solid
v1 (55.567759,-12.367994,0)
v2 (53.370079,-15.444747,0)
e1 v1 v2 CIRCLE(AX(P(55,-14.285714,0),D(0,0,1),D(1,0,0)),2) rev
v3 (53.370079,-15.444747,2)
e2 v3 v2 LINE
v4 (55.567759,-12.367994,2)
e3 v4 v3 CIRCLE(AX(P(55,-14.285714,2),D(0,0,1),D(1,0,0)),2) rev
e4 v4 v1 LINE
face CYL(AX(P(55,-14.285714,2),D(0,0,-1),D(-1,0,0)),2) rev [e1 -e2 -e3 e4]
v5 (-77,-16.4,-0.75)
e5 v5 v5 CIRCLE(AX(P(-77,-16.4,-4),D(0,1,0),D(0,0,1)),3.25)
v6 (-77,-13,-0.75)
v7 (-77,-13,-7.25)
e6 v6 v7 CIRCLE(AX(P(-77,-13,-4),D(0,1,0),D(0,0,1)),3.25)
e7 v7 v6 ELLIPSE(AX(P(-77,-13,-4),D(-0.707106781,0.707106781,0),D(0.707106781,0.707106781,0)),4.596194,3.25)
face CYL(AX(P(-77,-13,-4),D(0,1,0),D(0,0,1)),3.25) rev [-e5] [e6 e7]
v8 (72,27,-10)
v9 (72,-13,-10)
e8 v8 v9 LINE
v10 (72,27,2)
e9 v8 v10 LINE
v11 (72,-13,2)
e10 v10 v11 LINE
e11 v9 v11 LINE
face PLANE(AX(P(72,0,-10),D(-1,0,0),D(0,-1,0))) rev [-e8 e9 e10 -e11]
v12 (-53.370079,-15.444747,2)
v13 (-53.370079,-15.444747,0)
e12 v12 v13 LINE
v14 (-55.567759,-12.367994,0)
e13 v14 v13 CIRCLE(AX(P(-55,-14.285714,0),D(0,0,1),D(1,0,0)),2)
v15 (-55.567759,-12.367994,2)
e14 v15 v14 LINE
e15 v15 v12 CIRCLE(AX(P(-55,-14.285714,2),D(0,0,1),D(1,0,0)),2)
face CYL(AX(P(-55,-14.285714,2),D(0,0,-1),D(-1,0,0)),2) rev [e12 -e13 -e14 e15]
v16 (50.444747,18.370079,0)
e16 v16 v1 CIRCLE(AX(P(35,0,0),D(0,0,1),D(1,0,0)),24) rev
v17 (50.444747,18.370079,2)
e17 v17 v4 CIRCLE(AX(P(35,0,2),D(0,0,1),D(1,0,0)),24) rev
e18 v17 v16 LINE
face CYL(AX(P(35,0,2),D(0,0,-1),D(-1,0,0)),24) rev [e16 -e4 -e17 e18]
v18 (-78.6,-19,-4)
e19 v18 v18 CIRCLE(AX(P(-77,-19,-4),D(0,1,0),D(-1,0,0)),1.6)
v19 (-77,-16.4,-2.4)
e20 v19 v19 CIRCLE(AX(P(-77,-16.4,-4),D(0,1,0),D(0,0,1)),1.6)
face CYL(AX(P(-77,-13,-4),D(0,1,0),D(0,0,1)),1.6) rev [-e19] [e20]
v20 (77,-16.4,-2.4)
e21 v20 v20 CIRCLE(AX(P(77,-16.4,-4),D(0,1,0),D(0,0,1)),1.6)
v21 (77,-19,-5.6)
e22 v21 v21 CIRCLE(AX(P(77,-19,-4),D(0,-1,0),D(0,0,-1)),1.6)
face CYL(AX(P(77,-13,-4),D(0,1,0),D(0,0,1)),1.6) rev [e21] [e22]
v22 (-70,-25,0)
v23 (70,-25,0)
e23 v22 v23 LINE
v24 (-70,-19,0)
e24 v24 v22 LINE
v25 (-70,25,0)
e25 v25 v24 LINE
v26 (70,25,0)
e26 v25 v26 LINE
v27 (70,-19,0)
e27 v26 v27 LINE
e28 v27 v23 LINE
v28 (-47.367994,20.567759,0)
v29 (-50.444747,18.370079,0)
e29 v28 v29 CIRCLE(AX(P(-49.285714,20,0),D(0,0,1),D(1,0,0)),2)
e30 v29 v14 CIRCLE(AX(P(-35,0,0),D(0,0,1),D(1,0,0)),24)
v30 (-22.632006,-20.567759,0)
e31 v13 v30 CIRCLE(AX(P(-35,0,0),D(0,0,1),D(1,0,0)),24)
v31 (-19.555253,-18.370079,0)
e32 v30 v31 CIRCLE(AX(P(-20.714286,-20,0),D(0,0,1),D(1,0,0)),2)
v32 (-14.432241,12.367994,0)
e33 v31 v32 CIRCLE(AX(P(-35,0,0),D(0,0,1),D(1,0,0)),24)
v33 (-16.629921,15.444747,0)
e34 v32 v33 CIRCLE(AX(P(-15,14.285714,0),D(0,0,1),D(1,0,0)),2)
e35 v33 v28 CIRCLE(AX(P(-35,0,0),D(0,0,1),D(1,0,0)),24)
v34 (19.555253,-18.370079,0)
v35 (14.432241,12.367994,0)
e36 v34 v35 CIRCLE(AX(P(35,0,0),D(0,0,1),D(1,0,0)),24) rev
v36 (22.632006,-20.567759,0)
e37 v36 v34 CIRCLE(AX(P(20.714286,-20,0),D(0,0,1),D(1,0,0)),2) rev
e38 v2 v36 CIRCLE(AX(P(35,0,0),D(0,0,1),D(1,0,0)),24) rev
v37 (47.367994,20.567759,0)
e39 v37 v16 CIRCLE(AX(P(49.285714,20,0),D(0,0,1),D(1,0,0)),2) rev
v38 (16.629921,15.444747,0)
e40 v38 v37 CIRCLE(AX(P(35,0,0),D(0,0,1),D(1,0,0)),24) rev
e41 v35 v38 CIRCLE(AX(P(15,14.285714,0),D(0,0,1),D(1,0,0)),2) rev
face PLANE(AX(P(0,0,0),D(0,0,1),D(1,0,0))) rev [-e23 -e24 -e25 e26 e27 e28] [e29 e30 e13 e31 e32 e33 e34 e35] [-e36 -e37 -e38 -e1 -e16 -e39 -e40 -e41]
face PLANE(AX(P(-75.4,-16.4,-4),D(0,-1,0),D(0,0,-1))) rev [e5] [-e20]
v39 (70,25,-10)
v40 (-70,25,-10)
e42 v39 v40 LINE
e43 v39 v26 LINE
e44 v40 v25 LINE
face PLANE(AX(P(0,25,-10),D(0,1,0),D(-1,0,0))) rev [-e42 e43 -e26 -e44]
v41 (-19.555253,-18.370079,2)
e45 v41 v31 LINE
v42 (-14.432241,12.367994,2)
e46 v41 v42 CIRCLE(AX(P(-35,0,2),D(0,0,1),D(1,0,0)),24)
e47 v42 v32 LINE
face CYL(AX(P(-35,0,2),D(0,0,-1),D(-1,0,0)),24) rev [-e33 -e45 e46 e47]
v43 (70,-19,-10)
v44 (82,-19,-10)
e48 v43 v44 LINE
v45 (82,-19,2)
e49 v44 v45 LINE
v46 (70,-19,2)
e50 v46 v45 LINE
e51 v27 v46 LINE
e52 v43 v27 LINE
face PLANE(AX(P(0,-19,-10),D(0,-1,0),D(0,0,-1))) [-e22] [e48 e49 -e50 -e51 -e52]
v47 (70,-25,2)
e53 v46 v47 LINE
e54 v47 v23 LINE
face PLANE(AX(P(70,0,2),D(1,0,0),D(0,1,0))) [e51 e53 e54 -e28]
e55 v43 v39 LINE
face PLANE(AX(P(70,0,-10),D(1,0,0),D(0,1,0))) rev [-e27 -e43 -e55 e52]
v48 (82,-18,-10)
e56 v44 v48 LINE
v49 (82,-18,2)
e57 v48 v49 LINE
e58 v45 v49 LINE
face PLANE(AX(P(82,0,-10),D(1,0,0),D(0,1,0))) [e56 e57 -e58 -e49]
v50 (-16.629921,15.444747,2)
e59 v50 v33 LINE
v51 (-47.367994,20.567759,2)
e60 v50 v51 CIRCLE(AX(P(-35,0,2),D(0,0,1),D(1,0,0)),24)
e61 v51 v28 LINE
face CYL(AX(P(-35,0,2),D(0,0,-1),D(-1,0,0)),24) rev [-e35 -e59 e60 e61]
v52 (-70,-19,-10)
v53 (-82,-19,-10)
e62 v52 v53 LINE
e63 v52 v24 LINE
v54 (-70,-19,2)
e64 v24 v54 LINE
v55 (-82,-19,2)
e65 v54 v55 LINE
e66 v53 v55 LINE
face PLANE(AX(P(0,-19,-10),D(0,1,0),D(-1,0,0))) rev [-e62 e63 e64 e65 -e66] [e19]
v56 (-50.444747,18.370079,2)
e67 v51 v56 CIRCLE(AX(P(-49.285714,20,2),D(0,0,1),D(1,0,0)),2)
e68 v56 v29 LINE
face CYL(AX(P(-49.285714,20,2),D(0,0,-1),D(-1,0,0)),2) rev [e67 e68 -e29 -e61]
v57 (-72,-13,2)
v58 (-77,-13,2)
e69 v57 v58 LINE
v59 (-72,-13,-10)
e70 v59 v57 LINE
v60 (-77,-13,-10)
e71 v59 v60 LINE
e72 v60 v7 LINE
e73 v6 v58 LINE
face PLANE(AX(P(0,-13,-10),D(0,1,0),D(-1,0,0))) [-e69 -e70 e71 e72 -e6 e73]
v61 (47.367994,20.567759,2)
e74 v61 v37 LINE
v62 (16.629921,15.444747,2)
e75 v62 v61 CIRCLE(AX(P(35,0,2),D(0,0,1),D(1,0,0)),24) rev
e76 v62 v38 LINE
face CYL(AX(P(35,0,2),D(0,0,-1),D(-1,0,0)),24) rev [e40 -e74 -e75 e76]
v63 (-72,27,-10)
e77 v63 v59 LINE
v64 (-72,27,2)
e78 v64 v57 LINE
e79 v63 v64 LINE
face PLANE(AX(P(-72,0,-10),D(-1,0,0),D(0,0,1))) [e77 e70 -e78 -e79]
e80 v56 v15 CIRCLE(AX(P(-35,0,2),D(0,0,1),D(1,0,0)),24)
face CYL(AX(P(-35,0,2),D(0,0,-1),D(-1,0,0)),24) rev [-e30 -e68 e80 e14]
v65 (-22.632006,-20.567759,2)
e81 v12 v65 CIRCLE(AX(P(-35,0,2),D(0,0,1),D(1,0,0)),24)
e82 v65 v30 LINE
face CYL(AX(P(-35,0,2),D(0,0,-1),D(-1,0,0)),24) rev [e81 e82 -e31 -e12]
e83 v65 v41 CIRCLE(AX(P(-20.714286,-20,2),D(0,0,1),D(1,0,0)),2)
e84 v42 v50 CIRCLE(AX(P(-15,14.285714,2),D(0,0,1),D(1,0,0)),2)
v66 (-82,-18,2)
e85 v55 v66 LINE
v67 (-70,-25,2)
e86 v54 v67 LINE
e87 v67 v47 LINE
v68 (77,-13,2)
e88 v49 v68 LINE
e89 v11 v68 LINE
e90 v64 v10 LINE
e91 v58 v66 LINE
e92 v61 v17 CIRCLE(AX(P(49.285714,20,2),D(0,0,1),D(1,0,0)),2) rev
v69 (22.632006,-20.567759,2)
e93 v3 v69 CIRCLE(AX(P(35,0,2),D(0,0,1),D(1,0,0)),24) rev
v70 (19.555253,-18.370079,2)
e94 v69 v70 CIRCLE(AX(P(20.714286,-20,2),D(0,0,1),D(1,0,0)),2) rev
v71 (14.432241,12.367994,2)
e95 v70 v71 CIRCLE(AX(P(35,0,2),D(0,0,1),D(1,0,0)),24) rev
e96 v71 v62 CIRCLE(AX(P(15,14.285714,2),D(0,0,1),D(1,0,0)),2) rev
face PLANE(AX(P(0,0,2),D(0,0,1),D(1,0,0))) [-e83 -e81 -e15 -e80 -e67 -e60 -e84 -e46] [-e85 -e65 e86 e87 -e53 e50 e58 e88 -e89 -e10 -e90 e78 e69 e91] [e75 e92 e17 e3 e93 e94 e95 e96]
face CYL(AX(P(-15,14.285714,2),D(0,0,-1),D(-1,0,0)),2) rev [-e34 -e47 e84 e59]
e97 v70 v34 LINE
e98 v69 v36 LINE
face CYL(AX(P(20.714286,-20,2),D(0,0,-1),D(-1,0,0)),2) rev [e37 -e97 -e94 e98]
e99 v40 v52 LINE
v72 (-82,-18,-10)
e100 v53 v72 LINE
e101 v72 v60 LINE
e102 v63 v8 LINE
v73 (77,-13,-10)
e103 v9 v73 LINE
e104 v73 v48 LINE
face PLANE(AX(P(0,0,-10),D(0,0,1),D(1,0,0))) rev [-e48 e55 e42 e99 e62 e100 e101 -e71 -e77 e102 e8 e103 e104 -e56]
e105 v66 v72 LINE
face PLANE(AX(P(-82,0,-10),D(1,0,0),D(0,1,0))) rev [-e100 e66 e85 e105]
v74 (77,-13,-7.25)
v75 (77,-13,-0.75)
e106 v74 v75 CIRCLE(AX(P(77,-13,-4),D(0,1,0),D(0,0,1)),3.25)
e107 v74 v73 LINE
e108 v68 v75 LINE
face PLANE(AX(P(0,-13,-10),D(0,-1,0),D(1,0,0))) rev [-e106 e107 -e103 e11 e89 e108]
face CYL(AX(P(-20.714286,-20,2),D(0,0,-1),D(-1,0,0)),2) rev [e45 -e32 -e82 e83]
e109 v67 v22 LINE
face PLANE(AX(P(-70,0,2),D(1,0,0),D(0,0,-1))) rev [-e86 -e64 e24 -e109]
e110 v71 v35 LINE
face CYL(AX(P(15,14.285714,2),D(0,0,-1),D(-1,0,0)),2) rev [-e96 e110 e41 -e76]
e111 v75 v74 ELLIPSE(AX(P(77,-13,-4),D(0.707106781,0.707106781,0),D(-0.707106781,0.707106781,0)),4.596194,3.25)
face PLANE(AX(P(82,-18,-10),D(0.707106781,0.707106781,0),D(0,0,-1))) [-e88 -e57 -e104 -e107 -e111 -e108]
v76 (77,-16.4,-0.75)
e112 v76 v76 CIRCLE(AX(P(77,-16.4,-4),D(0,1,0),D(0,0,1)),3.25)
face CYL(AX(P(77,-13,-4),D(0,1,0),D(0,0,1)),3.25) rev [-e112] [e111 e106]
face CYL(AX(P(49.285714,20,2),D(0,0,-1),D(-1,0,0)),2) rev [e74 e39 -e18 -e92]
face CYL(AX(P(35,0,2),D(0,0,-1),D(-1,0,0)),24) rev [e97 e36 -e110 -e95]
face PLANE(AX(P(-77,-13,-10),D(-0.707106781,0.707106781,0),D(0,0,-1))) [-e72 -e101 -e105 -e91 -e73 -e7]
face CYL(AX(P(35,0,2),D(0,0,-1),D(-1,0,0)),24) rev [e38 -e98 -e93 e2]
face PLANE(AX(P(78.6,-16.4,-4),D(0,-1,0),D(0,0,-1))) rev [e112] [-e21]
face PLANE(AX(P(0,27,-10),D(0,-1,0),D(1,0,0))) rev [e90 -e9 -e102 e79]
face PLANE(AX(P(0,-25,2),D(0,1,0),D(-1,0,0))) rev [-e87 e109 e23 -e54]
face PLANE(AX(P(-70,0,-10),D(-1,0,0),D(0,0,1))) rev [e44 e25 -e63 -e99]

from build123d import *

# Parameters (mm, degrees)
SZKIC1_W                    = 140
SZKIC1_H                    = 50
DODANIE_WYCI_GNI_CIE1_DEPTH = 2
DODANIE_WYCI_GNI_CIE2_DEPTH = 12
SFAZOWANIE1_SIZE            = 5


with BuildPart() as part:
    # Szkic1 → Dodanie-wyciągnięcie1 (new body)
    with BuildSketch(Plane.XY):
        Rectangle(SZKIC1_W, SZKIC1_H)
        with BuildLine():
            ThreePointArc((-14.432240892, 12.367994391), (-11.873973335, 6.417701356), (-11, 0))
            ThreePointArc((-11, 0), (-13.243691419, -10.132276987), (-19.555253078, -18.370078729))
            ThreePointArc((-19.555253078, -18.370078729), (-18.936918944, -19.082957273), (-18.714285714, -20))
            ThreePointArc((-18.714285714, -20), (-20.427440625, -21.97932309), (-22.632005609, -20.567759108))
            ThreePointArc((-22.632005609, -20.567759108), (-38.945575695, -23.673454172), (-53.370078729, -15.444746922))
            ThreePointArc((-53.370078729, -15.444746922), (-56.627466942, -15.448190673), (-55.567759108, -12.367994391))
            ThreePointArc((-55.567759108, -12.367994391), (-58.673454172, 3.945575695), (-50.444746922, 18.370078729))
            ThreePointArc((-50.444746922, 18.370078729), (-50.448190673, 21.627466942), (-47.367994391, 20.567759108))
            ThreePointArc((-47.367994391, 20.567759108), (-31.054424305, 23.673454172), (-16.629921271, 15.444746922))
            ThreePointArc((-16.629921271, 15.444746922), (-14.391659035, 16.190949513), (-13, 14.285714286))
            ThreePointArc((-13, 14.285714286), (-13.397577113, 13.088951614), (-14.432240892, 12.367994391))
        make_face(mode=Mode.SUBTRACT)
        with BuildLine():
            ThreePointArc((50.444746922, 18.370078729), (56.756308581, 10.132276987), (59, 0))
            ThreePointArc((59, 0), (58.126026665, -6.417701356), (55.567759108, -12.367994391))
            ThreePointArc((55.567759108, -12.367994391), (56.602422887, -13.088951614), (57, -14.285714286))
            ThreePointArc((57, -14.285714286), (55.608340965, -16.190949513), (53.370078729, -15.444746922))
            ThreePointArc((53.370078729, -15.444746922), (38.945575695, -23.673454172), (22.632005609, -20.567759108))
            ThreePointArc((22.632005609, -20.567759108), (19.551809327, -21.627466942), (19.555253078, -18.370078729))
            ThreePointArc((19.555253078, -18.370078729), (11.326545828, -3.945575695), (14.432240892, 12.367994391))
            ThreePointArc((14.432240892, 12.367994391), (13.372533058, 15.448190673), (16.629921271, 15.444746922))
            ThreePointArc((16.629921271, 15.444746922), (31.054424305, 23.673454172), (47.367994391, 20.567759108))
            ThreePointArc((47.367994391, 20.567759108), (49.572559375, 21.97932309), (51.285714286, 20))
            ThreePointArc((51.285714286, 20), (51.063081056, 19.082957273), (50.444746922, 18.370078729))
        make_face(mode=Mode.SUBTRACT)
    extrude(amount=DODANIE_WYCI_GNI_CIE1_DEPTH)

    # Szkic2 → Dodanie-wyciągnięcie2 (add)
    with BuildSketch(Plane.XY.offset(2)):
        Polygon((70, 25), (70, -19), (82, -19), (82, -13), (72, -13), (72, 27), (-72, 27), (-72, -13), (-82, -13), (-82, -19), (-70, -19), (-70, 25), align=None)
    extrude(amount=-DODANIE_WYCI_GNI_CIE2_DEPTH)

    # Szkic4 → CBORE for M3 Hex Socket Head Cap Screw1 (revolve, cut)
    with BuildSketch(Plane(origin=(-77, -13, -4), x_dir=(0, 0, 1), z_dir=(1, 0, 0))):
        Polygon((0, 0), (0, 8.66137699), (1.6, 7.7), (1.6, 3.4), (3.25, 3.4), (3.25, 0), align=None)
    cbore_for_m3_hex_socket_head_cap_screw1 = revolve(axis=Axis((-77, -6.65, -4), (0, -1, 0)), mode=Mode.SUBTRACT)

    # Lustro1: CBORE for M3 Hex Socket Head Cap Screw1 across plane
    add(cbore_for_m3_hex_socket_head_cap_screw1.mirror(Plane(origin=(0, 0, 0), x_dir=(0, 0, 1), z_dir=(1, 0, 0))), mode=Mode.SUBTRACT)

    # Sfazowanie1
    # the kernel refuses this chamfer: 5 mm, written as the material it takes off along each edge
    with BuildSketch(Plane(origin=(-82, -13, 14.85841494), x_dir=(0.9996219169112968, 0.027495876610586625, 0), z_dir=(0, 0, -1)), Plane(origin=(82, -13, 14.85841494), x_dir=(0.027495876610590466, -0.9996219169112965, 0), z_dir=(0, 0, -1))) as sfazowanie1_piece_1:
        Polygon((SFAZOWANIE1_SIZE * 0.999621916911, SFAZOWANIE1_SIZE * 0.0274958766106), (-SFAZOWANIE1_SIZE * 0.0274958766106, SFAZOWANIE1_SIZE * 0.999621916911), (0, 0), align=None)
    extrude(amount=37.71682988, mode=Mode.SUBTRACT)


solid = part.part
